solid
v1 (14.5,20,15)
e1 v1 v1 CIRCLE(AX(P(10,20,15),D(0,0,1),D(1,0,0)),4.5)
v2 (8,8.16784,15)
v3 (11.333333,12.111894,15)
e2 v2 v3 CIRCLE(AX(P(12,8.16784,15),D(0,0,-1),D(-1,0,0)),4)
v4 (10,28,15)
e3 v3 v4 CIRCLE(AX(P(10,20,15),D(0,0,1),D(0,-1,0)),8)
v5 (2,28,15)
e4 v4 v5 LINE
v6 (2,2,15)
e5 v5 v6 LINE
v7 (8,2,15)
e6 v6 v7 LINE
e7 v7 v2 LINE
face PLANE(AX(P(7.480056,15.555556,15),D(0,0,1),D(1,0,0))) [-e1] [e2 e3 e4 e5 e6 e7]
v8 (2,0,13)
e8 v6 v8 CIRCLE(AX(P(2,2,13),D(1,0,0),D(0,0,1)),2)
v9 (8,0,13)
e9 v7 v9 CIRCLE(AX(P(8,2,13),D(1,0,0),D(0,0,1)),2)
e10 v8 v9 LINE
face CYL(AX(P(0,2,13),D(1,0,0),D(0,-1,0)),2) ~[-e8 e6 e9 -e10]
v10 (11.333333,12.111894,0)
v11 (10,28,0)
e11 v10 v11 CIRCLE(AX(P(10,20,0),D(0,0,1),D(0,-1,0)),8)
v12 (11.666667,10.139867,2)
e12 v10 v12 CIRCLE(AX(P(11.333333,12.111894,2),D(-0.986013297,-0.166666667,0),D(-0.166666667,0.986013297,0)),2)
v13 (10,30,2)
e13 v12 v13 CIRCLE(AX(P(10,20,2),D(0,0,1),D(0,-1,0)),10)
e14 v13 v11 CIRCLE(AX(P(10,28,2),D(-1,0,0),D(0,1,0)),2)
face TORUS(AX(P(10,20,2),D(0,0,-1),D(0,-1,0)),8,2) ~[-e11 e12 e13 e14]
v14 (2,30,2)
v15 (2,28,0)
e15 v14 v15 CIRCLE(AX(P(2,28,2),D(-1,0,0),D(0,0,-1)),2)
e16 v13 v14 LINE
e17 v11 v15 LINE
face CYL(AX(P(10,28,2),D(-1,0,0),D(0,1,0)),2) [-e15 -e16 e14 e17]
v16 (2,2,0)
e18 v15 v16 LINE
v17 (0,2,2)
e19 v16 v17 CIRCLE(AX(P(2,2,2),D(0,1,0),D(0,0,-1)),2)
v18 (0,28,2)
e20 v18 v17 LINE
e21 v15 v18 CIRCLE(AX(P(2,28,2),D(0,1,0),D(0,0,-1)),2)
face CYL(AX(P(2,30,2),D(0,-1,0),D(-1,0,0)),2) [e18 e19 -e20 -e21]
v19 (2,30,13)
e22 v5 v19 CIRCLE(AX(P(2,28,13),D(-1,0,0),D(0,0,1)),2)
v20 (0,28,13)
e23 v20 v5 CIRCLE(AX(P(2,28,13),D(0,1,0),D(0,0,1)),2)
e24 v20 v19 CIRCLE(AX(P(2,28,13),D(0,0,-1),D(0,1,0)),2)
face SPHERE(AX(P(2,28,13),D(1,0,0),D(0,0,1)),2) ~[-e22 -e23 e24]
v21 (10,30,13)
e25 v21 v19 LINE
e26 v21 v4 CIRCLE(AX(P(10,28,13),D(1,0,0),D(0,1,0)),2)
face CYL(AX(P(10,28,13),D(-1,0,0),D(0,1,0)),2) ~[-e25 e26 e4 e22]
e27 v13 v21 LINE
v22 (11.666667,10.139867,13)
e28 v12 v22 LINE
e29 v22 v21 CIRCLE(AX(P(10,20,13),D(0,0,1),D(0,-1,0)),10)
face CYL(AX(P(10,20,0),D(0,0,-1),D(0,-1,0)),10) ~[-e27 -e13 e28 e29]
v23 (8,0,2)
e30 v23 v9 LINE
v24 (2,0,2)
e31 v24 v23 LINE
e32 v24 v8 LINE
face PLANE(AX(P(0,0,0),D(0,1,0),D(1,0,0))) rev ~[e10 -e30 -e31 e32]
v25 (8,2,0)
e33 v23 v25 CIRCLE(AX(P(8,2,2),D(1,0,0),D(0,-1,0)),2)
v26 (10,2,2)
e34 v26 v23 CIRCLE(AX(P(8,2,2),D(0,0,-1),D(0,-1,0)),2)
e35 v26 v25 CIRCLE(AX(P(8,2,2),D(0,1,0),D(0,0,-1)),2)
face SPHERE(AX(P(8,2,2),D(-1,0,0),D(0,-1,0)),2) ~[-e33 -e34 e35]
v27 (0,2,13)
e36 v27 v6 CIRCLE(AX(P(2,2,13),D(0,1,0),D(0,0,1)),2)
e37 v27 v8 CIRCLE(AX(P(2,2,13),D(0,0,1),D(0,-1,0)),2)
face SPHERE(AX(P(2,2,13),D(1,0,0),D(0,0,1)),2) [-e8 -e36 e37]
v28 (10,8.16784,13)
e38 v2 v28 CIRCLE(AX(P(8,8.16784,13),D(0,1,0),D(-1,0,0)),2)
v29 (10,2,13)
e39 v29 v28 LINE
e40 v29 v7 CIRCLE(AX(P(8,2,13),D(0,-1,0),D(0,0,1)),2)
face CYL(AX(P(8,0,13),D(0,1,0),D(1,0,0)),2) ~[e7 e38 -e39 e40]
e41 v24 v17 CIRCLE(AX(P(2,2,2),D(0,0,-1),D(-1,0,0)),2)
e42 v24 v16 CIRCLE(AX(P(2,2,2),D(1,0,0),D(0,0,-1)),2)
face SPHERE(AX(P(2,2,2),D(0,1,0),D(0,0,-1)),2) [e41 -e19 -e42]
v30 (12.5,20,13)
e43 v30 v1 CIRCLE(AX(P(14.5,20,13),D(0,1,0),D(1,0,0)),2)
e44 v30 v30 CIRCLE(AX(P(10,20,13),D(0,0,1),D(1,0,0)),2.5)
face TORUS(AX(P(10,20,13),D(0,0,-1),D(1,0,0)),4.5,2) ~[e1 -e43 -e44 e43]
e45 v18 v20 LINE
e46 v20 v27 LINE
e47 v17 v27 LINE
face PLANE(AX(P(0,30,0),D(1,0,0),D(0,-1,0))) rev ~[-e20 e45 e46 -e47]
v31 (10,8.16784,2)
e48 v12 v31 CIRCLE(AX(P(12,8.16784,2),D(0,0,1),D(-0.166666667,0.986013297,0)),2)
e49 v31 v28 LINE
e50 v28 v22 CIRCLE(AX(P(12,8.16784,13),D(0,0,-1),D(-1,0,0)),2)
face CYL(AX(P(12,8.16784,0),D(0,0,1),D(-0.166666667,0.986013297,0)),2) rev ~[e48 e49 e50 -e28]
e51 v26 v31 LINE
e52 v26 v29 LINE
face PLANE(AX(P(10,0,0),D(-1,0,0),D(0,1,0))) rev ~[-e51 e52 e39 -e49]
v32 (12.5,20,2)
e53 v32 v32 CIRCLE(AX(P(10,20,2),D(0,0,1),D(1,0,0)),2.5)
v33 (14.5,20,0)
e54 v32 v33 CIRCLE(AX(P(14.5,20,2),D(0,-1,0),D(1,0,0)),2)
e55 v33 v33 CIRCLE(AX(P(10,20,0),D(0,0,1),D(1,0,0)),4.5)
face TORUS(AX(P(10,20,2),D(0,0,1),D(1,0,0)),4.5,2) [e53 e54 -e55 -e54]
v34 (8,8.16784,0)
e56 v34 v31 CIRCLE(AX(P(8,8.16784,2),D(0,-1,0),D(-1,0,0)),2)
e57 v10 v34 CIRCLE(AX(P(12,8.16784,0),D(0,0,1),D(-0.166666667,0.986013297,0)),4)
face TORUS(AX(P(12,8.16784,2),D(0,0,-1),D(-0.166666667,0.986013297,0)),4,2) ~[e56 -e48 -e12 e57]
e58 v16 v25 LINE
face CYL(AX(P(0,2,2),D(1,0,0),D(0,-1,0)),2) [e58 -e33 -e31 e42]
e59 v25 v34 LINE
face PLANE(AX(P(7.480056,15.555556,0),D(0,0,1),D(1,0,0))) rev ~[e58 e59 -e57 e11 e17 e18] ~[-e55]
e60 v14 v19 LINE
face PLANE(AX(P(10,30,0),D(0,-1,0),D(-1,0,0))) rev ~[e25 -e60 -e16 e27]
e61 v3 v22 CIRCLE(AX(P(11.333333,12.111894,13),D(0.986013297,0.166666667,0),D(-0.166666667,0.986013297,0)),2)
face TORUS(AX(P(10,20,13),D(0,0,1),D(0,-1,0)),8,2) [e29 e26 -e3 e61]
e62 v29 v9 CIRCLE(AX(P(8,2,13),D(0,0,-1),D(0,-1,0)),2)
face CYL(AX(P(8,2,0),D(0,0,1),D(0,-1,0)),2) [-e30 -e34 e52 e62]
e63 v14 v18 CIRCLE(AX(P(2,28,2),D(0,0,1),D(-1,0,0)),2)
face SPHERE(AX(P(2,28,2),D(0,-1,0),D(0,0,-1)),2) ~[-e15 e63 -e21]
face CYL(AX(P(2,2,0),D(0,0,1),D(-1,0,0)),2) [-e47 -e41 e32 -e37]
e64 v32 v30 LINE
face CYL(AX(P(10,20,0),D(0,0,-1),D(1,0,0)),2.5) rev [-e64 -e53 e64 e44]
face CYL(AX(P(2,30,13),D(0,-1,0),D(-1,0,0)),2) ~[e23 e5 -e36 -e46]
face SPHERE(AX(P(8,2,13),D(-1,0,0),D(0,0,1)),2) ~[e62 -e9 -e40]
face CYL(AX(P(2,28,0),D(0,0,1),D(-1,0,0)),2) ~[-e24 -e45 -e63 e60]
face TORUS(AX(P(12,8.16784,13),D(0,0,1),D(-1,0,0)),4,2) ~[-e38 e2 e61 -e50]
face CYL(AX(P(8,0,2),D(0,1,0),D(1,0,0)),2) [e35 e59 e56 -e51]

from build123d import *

# Parameters (mm, degrees)
F0_R     = 2.5
F1_DEPTH = 15
F2_R     = 2


with BuildPart() as f1:
    # F0 (on Top) → F1 (new body)
    with BuildSketch(Plane.XY):
        with BuildLine():
            Line((0, 30), (0, 0))
            Line((0, 0), (10, 0))
            Line((10, 0), (10, 10))
            ThreePointArc((10, 10), (20, 20), (10, 30))
            Line((10, 30), (0, 30))
        make_face()
        with Locations((10, 20)):
            Circle(F0_R, mode=Mode.SUBTRACT)
    extrude(amount=F1_DEPTH)

    # F2
    f2_edges = [f1.edges().sort_by_distance(p)[0] for p in [
        (5, 0, 15),
        (10, 5, 15),
        (20, 20, 15),
        (0, 15, 15),
        (0, 15, 0),
        (10, 10, 7.5),
        (10, 30, 7.5),
        (20, 20, 0),
        (7.5, 20, 0),
        (5, 0, 0),
        (0, 0, 7.5),
        (10, 0, 7.5),
        (0, 30, 7.5),
        (12.5, 20, 7.5),
        (7.5, 20, 15),
        (5, 30, 15),
        (5, 30, 0),
        (10, 5, 0),
    ]]
    fillet(f2_edges, radius=F2_R)


solid = f1.part
